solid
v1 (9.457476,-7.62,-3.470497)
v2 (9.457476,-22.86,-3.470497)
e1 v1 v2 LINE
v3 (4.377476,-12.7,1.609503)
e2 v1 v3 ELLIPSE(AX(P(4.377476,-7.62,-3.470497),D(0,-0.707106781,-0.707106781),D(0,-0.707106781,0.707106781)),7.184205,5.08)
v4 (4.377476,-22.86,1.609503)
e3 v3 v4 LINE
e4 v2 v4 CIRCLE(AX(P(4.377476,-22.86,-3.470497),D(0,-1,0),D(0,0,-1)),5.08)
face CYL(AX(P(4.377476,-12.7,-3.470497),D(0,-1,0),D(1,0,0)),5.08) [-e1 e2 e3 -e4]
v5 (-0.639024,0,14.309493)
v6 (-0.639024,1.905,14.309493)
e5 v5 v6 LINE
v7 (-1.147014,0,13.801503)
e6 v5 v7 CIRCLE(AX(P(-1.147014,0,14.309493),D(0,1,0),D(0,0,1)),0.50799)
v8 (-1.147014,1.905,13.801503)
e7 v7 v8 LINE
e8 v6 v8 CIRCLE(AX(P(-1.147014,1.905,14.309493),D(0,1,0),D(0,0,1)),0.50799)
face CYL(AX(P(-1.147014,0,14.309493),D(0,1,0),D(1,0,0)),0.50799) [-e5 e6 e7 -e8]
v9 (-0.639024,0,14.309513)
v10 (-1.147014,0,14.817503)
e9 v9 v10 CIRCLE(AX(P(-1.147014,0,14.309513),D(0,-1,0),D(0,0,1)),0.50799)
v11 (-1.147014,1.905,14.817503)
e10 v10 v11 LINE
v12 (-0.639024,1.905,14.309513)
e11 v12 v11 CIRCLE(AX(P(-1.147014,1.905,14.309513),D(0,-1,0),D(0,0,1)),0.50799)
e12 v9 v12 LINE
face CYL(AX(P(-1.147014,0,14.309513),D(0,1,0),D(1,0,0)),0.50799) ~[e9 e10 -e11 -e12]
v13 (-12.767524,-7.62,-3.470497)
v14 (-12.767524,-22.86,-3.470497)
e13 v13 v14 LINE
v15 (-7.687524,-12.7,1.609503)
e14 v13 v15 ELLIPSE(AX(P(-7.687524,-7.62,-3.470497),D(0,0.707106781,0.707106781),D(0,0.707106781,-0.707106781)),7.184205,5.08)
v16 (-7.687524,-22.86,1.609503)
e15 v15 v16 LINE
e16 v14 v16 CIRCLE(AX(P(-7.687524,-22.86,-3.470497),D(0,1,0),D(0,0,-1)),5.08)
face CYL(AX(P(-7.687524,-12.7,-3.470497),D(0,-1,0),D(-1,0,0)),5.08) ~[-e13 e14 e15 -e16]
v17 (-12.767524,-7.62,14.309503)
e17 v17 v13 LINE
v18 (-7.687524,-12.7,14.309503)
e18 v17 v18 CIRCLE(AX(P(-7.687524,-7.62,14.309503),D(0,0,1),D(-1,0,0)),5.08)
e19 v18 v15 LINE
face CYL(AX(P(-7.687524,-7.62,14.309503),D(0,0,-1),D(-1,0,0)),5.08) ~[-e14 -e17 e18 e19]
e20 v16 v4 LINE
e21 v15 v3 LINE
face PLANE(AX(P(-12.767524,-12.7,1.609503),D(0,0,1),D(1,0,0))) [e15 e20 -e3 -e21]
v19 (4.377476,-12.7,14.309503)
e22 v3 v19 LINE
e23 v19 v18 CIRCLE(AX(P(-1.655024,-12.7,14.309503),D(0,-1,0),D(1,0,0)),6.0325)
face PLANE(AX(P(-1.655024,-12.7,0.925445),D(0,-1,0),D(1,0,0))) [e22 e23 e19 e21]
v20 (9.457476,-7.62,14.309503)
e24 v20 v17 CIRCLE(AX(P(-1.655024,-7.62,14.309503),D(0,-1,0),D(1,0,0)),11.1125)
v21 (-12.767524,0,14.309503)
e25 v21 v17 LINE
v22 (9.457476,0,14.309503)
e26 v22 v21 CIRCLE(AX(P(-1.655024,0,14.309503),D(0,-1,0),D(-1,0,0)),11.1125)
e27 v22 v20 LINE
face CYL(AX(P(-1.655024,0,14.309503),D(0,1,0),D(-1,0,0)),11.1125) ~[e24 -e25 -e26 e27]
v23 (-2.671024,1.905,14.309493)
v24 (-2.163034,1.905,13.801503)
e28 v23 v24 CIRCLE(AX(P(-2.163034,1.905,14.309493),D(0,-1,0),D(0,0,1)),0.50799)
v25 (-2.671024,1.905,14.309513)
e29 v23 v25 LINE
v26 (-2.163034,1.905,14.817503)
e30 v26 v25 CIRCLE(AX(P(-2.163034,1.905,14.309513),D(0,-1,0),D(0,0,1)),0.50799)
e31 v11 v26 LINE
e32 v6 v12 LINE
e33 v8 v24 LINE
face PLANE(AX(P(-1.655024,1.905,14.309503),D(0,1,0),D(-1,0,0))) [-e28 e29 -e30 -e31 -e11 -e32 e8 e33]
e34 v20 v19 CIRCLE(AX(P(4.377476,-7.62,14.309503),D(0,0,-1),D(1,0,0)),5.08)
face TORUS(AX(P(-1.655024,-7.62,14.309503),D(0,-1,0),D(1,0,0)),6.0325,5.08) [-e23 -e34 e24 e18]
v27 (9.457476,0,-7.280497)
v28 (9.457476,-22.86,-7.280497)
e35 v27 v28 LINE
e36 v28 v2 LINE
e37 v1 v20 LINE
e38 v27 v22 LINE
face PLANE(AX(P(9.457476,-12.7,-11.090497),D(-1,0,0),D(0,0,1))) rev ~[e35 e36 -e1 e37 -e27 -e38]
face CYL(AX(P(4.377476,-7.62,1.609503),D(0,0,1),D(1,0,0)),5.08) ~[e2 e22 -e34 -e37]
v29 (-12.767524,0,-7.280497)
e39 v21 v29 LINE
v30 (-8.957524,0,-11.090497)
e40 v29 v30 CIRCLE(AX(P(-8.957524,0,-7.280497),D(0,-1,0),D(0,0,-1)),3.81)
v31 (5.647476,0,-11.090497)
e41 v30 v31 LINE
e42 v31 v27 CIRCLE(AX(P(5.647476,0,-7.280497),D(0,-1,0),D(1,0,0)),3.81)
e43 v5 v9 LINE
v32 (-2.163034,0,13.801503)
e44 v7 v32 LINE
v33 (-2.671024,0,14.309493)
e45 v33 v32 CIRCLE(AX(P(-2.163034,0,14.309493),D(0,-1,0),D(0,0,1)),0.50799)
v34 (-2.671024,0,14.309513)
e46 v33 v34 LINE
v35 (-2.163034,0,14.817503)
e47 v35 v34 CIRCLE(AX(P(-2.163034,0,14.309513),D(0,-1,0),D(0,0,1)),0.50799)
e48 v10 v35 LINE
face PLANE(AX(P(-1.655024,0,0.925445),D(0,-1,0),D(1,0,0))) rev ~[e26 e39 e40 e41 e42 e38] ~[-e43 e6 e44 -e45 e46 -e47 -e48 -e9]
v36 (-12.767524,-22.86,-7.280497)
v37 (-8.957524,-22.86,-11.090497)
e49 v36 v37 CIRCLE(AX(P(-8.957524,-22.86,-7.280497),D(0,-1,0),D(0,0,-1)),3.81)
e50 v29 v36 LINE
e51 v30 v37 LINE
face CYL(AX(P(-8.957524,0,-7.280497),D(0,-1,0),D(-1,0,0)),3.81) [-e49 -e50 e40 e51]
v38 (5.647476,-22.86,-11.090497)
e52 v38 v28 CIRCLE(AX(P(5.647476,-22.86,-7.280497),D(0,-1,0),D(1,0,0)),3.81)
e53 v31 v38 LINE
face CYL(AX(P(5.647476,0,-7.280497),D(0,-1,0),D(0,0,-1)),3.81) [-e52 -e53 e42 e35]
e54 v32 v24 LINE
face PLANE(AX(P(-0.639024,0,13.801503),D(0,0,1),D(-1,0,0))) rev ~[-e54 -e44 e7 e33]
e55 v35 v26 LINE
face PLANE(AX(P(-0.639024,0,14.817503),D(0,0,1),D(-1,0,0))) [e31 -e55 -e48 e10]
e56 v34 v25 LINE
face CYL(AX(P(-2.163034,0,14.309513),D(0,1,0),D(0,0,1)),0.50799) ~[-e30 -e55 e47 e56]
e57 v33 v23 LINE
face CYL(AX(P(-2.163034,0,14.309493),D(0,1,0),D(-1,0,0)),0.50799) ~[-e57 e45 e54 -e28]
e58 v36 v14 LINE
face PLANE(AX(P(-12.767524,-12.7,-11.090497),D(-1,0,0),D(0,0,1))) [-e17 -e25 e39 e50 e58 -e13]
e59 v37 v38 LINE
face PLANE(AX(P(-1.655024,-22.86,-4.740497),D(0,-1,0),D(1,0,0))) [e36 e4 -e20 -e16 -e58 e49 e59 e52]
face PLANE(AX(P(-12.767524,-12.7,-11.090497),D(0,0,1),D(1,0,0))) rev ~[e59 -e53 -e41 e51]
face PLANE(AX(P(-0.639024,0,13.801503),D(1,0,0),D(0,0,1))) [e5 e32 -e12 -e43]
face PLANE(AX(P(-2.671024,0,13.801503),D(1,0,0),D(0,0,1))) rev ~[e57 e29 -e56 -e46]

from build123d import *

# Parameters (mm, degrees)
F1_DEPTH = 12.7
F2_W     = 22.225
F2_H     = 12.7
F3_DEPTH = 10.16
F4_R     = 5.08
F5_R     = 3.81
F6_W     = 2.032
F6_H     = 1.016
F7_DEPTH = 1.905
F8_R     = 0.50799


# Not quite as in the source:
# - a fillet or chamfer is up to 0.001 mm smaller than in the source, because OpenCascade refuses the exact size


with BuildPart() as f1:
    # F0 (on Front) → F1 (new body)
    with BuildSketch(Plane.XZ):
        with BuildLine():
            Line((-12.7675240695, 14.3095031442), (-12.7675240695, -11.0904968558))
            Line((-12.7675240695, -11.0904968558), (9.4574759305, -11.0904968558))
            Line((9.4574759305, -11.0904968558), (9.4574759305, 14.3095031442))
            ThreePointArc((9.4574759305, 14.3095031442), (-1.6550240695, 3.1970031442), (-12.7675240695, 14.3095031442))
        make_face()
        with BuildLine():
            ThreePointArc((9.4574759305, 14.3095031442), (-1.6550240695, 25.4220031442), (-12.7675240695, 14.3095031442))
            ThreePointArc((-12.7675240695, 14.3095031442), (-1.6550240695, 3.1970031442), (9.4574759305, 14.3095031442))
        make_face()
    extrude(amount=F1_DEPTH)

    # F2 (on face) → F3 (join)
    with BuildSketch(Plane.XZ.offset(12.7)):
        with Locations((-1.6550240695, -4.7404968558)):
            Rectangle(F2_W, F2_H)
    extrude(amount=F3_DEPTH)

    # F4
    f4_edges = [f1.edges().sort_by_distance(p)[0] for p in [
        (9.457476, -12.7, 7.959503),
        (-12.767524, -17.78, 1.609503),
        (9.457476, -17.78, 1.609503),
    ]]
    fillet(f4_edges, radius=F4_R)

    # F5
    f5_edges = [f1.edges().sort_by_distance(p)[0] for p in [
        (-12.767524, -11.43, -11.090497),
        (9.457476, -11.43, -11.090497),
    ]]
    fillet(f5_edges, radius=F5_R)

    # F6 (on face) → F7 (join)
    with BuildSketch(Plane(origin=(0, 0, 0), x_dir=(-1, 0, 0), z_dir=(0, 1, 0))):
        with Locations((1.6550240695, 14.3095031442)):
            Rectangle(F6_W, F6_H)
    extrude(amount=F7_DEPTH)

    # F8 (radius 0.508 in the source; OpenCascade refuses exactly that, so slightly less here)
    f8_edges = [f1.edges().sort_by_distance(p)[0] for p in [
        (-0.639024, 0.9525, 14.817503),
        (-0.639024, 0.9525, 13.801503),
        (-2.671024, 0.9525, 13.801503),
        (-2.671024, 0.9525, 14.817503),
    ]]
    fillet(f8_edges, radius=F8_R)


solid = f1.part
